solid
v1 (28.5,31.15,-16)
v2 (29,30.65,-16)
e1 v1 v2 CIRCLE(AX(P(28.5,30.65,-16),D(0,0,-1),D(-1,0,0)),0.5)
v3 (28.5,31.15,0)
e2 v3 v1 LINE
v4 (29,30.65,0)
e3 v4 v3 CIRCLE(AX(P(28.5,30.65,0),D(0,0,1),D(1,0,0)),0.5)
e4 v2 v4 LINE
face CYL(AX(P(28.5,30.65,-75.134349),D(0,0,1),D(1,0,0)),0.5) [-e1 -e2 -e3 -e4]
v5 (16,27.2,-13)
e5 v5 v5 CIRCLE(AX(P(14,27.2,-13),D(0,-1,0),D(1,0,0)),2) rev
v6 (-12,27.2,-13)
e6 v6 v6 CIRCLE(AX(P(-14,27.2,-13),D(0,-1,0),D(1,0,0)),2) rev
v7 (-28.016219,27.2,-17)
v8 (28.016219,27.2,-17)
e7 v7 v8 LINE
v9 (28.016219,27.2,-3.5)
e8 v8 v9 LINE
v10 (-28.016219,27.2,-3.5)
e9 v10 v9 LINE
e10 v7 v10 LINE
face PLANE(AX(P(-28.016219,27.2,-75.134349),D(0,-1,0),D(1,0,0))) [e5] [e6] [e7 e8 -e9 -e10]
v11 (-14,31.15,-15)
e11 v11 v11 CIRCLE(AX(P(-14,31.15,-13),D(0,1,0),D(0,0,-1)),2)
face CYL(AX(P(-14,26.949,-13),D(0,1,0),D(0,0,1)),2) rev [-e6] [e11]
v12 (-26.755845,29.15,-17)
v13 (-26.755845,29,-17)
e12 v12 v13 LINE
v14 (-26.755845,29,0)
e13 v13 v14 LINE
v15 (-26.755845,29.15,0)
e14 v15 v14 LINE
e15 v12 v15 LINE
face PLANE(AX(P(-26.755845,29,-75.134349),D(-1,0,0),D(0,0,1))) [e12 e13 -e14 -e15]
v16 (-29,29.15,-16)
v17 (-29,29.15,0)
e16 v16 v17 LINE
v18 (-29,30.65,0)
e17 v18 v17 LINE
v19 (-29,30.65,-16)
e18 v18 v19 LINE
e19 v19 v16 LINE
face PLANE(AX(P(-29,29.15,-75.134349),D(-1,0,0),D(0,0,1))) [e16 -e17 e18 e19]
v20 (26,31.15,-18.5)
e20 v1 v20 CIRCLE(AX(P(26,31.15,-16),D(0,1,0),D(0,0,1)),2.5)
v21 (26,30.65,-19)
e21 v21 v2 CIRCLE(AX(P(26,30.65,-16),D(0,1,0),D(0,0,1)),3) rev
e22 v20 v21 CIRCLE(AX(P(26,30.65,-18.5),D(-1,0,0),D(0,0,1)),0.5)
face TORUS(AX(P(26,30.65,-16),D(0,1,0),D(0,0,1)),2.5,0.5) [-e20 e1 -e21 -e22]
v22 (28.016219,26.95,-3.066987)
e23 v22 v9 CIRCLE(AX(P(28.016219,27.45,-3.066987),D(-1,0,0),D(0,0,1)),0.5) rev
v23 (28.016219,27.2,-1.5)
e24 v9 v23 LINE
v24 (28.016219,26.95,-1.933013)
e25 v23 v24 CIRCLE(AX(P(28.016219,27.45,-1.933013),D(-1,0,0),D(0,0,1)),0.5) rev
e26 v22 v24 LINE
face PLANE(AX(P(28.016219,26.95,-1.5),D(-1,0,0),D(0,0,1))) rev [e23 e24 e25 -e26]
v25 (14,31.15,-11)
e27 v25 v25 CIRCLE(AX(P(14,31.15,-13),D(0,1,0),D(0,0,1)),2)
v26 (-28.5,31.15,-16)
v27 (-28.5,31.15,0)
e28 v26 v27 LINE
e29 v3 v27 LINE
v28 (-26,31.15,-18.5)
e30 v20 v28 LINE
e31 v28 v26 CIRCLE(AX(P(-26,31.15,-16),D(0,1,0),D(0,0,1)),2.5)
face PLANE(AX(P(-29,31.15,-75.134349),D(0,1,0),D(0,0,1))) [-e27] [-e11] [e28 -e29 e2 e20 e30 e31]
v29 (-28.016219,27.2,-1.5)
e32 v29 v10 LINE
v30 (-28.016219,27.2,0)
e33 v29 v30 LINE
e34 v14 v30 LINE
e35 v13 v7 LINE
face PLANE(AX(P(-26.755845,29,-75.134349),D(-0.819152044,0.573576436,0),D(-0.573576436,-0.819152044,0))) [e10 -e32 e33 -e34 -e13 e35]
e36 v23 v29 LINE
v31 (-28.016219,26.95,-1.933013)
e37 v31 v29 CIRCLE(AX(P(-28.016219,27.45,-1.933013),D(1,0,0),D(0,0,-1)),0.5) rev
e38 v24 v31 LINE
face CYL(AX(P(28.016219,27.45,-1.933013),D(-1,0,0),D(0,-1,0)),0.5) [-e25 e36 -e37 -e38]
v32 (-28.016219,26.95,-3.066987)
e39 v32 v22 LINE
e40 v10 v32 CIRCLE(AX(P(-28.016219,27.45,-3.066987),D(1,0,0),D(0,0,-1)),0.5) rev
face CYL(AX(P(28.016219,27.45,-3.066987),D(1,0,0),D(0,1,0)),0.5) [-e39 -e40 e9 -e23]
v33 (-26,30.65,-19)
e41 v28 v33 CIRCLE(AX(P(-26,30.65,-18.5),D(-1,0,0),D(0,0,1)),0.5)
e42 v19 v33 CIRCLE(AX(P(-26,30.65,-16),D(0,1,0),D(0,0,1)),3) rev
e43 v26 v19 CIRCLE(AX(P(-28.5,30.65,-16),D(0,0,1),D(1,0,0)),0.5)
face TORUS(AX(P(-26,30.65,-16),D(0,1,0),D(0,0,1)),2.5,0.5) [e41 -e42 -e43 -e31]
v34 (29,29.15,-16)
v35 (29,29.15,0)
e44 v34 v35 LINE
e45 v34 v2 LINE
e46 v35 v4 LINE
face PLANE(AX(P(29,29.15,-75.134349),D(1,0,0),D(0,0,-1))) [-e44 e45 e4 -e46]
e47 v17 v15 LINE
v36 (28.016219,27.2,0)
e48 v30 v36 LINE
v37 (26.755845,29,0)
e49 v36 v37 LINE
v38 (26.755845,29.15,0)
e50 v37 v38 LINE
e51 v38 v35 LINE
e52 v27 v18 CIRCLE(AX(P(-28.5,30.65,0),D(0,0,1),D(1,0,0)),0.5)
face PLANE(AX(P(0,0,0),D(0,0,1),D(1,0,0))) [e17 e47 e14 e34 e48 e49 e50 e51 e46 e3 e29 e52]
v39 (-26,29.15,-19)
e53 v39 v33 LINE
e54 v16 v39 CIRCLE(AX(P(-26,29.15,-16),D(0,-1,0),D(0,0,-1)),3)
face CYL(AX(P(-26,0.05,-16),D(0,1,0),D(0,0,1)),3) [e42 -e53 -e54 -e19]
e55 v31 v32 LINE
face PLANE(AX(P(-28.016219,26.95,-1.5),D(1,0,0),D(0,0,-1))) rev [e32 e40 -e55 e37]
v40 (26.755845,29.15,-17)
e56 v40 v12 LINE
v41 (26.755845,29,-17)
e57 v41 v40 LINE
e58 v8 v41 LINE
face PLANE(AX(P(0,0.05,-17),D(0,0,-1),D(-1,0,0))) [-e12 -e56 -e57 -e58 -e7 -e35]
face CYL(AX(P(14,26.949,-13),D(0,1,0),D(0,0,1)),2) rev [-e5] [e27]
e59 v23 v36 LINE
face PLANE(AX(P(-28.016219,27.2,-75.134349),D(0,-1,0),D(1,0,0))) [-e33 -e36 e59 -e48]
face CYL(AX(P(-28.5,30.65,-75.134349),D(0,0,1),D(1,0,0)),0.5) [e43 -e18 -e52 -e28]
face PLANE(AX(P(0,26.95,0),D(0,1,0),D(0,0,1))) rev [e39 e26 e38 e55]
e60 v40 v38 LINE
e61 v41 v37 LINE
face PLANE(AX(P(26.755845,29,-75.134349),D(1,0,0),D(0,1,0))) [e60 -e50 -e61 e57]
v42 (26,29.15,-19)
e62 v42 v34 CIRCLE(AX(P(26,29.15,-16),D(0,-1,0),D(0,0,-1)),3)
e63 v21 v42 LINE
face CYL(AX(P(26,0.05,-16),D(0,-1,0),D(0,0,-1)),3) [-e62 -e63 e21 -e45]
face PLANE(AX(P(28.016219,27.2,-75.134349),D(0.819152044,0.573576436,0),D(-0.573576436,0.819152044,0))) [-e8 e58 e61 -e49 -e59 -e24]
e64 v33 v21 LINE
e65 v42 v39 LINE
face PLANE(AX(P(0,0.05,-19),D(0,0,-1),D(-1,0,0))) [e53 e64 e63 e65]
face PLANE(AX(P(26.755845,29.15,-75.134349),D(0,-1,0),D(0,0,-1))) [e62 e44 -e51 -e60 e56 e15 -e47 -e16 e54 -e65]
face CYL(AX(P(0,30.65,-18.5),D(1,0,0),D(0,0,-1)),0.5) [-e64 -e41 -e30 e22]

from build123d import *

# Parameters (mm, degrees)
BOSS_EXTRUDE1_DEPTH = 17
SKETCH3_W           = 58
SKETCH3_H           = 2
BOSS_EXTRUDE2_DEPTH = 2
FILLET1_R           = 3
SKETCH4_W           = 56.032437302
SKETCH4_H           = 2
BOSS_EXTRUDE3_DEPTH = 0.25
FILLET2_R           = 0.5
CUT_EXTRUDE2_REACH  = 36.923
SKETCH7_R           = 2
FILLET3_R           = 0.5


with BuildPart() as part:
    # Sketch1 → Boss-Extrude1 (new body)
    with BuildSketch(Plane.XY):
        Polygon((-26.755845082, 29), (-28.016218651, 27.2), (28.016218651, 27.2), (26.755845082, 29), (26.755845082, 29.15), (29, 29.15), (29, 31.15), (-29, 31.15), (-29, 29.15), (-26.755845082, 29.15), align=None)
    extrude(amount=-BOSS_EXTRUDE1_DEPTH)

    # Sketch3 → Boss-Extrude2 (add)
    with BuildSketch(Plane(origin=(0, 0, -17), x_dir=(-1, 0, 0), z_dir=(0, 0, -1))):
        with Locations((0, 30.15)):
            Rectangle(SKETCH3_W, SKETCH3_H)
    extrude(amount=BOSS_EXTRUDE2_DEPTH)

    # Fillet1
    fillet1_edges = [part.edges().sort_by_distance(p)[0] for p in [
        (29, 30.15, -19),
        (-29, 30.15, -19),
    ]]
    fillet(fillet1_edges, radius=FILLET1_R)

    # Sketch4 → Boss-Extrude3 (add)
    with BuildSketch(Plane.XZ.offset(-27.2)):
        with Locations((0, -2.5)):
            Rectangle(SKETCH4_W, SKETCH4_H)
    extrude(amount=BOSS_EXTRUDE3_DEPTH)

    # Fillet2
    # the kernel refuses this fillet: 0.5 mm, written as the material it takes off along each edge
    with BuildSketch(Plane(origin=(-29.098750406, 26.95, -3.5), x_dir=(0, 1, 0), z_dir=(1, 0, 0)), Plane(origin=(29.098750406, 26.95, -1.5), x_dir=(0, 1, 0), z_dir=(-1, 0, 0))) as fillet2_piece_1:
        with BuildLine():
            CenterArc((0.5, 0.433012702), FILLET2_R, 180, 60)
            Line((0, 0.433012702), (-0.01, 0.433012702))
            Line((-0.01, 0.433012702), (-0.01, 0))
            Line((-0.01, 0), (0, -0.01))
            ThreePointArc((0, -0.01), (0.125, -0.01), (0.245, -0.008660254))
            Line((0.245, -0.008660254), (0.25, 0))
        make_face()
    extrude(amount=58.197500812, mode=Mode.SUBTRACT)

    # Sketch7 → Cut-Extrude2 (cut, up to next)
    with BuildSketch(Plane(origin=(0, 31.15, 0), x_dir=(1, 0, 0), z_dir=(0, 1, 0)), mode=Mode.PRIVATE) as cut_extrude2_sk1:
        with Locations(Location((14, 13, 0), (0, 0, 270))):
            Circle(SKETCH7_R)
    cut_extrude2_tool1 = extrude(cut_extrude2_sk1.sketch, amount=-CUT_EXTRUDE2_REACH, mode=Mode.PRIVATE) & part.part
    # Sketch7 → Cut-Extrude2 (cut, up to next)
    with BuildSketch(Plane(origin=(0, 31.15, 0), x_dir=(1, 0, 0), z_dir=(0, 1, 0)), mode=Mode.PRIVATE) as cut_extrude2_sk2:
        with Locations((-14, 13)):
            Circle(SKETCH7_R)
    cut_extrude2_tool2 = extrude(cut_extrude2_sk2.sketch, amount=-CUT_EXTRUDE2_REACH, mode=Mode.PRIVATE) & part.part
    add(cut_extrude2_tool1.solids().sort_by_distance((14, 31.15, -13))[0], mode=Mode.SUBTRACT)
    add(cut_extrude2_tool2.solids().sort_by_distance((-14, 31.15, -13))[0], mode=Mode.SUBTRACT)

    # Fillet3
    fillet3_edges = [part.edges().sort_by_distance(p)[0] for p in [
        (0, 31.15, -19),
        (29, 31.15, -8),
        (-29, 31.15, -8),
        (-28.121320344, 31.15, -18.121320344),
        (28.121320344, 31.15, -18.121320344),
    ]]
    fillet(fillet3_edges, radius=FILLET3_R)


solid = part.part
